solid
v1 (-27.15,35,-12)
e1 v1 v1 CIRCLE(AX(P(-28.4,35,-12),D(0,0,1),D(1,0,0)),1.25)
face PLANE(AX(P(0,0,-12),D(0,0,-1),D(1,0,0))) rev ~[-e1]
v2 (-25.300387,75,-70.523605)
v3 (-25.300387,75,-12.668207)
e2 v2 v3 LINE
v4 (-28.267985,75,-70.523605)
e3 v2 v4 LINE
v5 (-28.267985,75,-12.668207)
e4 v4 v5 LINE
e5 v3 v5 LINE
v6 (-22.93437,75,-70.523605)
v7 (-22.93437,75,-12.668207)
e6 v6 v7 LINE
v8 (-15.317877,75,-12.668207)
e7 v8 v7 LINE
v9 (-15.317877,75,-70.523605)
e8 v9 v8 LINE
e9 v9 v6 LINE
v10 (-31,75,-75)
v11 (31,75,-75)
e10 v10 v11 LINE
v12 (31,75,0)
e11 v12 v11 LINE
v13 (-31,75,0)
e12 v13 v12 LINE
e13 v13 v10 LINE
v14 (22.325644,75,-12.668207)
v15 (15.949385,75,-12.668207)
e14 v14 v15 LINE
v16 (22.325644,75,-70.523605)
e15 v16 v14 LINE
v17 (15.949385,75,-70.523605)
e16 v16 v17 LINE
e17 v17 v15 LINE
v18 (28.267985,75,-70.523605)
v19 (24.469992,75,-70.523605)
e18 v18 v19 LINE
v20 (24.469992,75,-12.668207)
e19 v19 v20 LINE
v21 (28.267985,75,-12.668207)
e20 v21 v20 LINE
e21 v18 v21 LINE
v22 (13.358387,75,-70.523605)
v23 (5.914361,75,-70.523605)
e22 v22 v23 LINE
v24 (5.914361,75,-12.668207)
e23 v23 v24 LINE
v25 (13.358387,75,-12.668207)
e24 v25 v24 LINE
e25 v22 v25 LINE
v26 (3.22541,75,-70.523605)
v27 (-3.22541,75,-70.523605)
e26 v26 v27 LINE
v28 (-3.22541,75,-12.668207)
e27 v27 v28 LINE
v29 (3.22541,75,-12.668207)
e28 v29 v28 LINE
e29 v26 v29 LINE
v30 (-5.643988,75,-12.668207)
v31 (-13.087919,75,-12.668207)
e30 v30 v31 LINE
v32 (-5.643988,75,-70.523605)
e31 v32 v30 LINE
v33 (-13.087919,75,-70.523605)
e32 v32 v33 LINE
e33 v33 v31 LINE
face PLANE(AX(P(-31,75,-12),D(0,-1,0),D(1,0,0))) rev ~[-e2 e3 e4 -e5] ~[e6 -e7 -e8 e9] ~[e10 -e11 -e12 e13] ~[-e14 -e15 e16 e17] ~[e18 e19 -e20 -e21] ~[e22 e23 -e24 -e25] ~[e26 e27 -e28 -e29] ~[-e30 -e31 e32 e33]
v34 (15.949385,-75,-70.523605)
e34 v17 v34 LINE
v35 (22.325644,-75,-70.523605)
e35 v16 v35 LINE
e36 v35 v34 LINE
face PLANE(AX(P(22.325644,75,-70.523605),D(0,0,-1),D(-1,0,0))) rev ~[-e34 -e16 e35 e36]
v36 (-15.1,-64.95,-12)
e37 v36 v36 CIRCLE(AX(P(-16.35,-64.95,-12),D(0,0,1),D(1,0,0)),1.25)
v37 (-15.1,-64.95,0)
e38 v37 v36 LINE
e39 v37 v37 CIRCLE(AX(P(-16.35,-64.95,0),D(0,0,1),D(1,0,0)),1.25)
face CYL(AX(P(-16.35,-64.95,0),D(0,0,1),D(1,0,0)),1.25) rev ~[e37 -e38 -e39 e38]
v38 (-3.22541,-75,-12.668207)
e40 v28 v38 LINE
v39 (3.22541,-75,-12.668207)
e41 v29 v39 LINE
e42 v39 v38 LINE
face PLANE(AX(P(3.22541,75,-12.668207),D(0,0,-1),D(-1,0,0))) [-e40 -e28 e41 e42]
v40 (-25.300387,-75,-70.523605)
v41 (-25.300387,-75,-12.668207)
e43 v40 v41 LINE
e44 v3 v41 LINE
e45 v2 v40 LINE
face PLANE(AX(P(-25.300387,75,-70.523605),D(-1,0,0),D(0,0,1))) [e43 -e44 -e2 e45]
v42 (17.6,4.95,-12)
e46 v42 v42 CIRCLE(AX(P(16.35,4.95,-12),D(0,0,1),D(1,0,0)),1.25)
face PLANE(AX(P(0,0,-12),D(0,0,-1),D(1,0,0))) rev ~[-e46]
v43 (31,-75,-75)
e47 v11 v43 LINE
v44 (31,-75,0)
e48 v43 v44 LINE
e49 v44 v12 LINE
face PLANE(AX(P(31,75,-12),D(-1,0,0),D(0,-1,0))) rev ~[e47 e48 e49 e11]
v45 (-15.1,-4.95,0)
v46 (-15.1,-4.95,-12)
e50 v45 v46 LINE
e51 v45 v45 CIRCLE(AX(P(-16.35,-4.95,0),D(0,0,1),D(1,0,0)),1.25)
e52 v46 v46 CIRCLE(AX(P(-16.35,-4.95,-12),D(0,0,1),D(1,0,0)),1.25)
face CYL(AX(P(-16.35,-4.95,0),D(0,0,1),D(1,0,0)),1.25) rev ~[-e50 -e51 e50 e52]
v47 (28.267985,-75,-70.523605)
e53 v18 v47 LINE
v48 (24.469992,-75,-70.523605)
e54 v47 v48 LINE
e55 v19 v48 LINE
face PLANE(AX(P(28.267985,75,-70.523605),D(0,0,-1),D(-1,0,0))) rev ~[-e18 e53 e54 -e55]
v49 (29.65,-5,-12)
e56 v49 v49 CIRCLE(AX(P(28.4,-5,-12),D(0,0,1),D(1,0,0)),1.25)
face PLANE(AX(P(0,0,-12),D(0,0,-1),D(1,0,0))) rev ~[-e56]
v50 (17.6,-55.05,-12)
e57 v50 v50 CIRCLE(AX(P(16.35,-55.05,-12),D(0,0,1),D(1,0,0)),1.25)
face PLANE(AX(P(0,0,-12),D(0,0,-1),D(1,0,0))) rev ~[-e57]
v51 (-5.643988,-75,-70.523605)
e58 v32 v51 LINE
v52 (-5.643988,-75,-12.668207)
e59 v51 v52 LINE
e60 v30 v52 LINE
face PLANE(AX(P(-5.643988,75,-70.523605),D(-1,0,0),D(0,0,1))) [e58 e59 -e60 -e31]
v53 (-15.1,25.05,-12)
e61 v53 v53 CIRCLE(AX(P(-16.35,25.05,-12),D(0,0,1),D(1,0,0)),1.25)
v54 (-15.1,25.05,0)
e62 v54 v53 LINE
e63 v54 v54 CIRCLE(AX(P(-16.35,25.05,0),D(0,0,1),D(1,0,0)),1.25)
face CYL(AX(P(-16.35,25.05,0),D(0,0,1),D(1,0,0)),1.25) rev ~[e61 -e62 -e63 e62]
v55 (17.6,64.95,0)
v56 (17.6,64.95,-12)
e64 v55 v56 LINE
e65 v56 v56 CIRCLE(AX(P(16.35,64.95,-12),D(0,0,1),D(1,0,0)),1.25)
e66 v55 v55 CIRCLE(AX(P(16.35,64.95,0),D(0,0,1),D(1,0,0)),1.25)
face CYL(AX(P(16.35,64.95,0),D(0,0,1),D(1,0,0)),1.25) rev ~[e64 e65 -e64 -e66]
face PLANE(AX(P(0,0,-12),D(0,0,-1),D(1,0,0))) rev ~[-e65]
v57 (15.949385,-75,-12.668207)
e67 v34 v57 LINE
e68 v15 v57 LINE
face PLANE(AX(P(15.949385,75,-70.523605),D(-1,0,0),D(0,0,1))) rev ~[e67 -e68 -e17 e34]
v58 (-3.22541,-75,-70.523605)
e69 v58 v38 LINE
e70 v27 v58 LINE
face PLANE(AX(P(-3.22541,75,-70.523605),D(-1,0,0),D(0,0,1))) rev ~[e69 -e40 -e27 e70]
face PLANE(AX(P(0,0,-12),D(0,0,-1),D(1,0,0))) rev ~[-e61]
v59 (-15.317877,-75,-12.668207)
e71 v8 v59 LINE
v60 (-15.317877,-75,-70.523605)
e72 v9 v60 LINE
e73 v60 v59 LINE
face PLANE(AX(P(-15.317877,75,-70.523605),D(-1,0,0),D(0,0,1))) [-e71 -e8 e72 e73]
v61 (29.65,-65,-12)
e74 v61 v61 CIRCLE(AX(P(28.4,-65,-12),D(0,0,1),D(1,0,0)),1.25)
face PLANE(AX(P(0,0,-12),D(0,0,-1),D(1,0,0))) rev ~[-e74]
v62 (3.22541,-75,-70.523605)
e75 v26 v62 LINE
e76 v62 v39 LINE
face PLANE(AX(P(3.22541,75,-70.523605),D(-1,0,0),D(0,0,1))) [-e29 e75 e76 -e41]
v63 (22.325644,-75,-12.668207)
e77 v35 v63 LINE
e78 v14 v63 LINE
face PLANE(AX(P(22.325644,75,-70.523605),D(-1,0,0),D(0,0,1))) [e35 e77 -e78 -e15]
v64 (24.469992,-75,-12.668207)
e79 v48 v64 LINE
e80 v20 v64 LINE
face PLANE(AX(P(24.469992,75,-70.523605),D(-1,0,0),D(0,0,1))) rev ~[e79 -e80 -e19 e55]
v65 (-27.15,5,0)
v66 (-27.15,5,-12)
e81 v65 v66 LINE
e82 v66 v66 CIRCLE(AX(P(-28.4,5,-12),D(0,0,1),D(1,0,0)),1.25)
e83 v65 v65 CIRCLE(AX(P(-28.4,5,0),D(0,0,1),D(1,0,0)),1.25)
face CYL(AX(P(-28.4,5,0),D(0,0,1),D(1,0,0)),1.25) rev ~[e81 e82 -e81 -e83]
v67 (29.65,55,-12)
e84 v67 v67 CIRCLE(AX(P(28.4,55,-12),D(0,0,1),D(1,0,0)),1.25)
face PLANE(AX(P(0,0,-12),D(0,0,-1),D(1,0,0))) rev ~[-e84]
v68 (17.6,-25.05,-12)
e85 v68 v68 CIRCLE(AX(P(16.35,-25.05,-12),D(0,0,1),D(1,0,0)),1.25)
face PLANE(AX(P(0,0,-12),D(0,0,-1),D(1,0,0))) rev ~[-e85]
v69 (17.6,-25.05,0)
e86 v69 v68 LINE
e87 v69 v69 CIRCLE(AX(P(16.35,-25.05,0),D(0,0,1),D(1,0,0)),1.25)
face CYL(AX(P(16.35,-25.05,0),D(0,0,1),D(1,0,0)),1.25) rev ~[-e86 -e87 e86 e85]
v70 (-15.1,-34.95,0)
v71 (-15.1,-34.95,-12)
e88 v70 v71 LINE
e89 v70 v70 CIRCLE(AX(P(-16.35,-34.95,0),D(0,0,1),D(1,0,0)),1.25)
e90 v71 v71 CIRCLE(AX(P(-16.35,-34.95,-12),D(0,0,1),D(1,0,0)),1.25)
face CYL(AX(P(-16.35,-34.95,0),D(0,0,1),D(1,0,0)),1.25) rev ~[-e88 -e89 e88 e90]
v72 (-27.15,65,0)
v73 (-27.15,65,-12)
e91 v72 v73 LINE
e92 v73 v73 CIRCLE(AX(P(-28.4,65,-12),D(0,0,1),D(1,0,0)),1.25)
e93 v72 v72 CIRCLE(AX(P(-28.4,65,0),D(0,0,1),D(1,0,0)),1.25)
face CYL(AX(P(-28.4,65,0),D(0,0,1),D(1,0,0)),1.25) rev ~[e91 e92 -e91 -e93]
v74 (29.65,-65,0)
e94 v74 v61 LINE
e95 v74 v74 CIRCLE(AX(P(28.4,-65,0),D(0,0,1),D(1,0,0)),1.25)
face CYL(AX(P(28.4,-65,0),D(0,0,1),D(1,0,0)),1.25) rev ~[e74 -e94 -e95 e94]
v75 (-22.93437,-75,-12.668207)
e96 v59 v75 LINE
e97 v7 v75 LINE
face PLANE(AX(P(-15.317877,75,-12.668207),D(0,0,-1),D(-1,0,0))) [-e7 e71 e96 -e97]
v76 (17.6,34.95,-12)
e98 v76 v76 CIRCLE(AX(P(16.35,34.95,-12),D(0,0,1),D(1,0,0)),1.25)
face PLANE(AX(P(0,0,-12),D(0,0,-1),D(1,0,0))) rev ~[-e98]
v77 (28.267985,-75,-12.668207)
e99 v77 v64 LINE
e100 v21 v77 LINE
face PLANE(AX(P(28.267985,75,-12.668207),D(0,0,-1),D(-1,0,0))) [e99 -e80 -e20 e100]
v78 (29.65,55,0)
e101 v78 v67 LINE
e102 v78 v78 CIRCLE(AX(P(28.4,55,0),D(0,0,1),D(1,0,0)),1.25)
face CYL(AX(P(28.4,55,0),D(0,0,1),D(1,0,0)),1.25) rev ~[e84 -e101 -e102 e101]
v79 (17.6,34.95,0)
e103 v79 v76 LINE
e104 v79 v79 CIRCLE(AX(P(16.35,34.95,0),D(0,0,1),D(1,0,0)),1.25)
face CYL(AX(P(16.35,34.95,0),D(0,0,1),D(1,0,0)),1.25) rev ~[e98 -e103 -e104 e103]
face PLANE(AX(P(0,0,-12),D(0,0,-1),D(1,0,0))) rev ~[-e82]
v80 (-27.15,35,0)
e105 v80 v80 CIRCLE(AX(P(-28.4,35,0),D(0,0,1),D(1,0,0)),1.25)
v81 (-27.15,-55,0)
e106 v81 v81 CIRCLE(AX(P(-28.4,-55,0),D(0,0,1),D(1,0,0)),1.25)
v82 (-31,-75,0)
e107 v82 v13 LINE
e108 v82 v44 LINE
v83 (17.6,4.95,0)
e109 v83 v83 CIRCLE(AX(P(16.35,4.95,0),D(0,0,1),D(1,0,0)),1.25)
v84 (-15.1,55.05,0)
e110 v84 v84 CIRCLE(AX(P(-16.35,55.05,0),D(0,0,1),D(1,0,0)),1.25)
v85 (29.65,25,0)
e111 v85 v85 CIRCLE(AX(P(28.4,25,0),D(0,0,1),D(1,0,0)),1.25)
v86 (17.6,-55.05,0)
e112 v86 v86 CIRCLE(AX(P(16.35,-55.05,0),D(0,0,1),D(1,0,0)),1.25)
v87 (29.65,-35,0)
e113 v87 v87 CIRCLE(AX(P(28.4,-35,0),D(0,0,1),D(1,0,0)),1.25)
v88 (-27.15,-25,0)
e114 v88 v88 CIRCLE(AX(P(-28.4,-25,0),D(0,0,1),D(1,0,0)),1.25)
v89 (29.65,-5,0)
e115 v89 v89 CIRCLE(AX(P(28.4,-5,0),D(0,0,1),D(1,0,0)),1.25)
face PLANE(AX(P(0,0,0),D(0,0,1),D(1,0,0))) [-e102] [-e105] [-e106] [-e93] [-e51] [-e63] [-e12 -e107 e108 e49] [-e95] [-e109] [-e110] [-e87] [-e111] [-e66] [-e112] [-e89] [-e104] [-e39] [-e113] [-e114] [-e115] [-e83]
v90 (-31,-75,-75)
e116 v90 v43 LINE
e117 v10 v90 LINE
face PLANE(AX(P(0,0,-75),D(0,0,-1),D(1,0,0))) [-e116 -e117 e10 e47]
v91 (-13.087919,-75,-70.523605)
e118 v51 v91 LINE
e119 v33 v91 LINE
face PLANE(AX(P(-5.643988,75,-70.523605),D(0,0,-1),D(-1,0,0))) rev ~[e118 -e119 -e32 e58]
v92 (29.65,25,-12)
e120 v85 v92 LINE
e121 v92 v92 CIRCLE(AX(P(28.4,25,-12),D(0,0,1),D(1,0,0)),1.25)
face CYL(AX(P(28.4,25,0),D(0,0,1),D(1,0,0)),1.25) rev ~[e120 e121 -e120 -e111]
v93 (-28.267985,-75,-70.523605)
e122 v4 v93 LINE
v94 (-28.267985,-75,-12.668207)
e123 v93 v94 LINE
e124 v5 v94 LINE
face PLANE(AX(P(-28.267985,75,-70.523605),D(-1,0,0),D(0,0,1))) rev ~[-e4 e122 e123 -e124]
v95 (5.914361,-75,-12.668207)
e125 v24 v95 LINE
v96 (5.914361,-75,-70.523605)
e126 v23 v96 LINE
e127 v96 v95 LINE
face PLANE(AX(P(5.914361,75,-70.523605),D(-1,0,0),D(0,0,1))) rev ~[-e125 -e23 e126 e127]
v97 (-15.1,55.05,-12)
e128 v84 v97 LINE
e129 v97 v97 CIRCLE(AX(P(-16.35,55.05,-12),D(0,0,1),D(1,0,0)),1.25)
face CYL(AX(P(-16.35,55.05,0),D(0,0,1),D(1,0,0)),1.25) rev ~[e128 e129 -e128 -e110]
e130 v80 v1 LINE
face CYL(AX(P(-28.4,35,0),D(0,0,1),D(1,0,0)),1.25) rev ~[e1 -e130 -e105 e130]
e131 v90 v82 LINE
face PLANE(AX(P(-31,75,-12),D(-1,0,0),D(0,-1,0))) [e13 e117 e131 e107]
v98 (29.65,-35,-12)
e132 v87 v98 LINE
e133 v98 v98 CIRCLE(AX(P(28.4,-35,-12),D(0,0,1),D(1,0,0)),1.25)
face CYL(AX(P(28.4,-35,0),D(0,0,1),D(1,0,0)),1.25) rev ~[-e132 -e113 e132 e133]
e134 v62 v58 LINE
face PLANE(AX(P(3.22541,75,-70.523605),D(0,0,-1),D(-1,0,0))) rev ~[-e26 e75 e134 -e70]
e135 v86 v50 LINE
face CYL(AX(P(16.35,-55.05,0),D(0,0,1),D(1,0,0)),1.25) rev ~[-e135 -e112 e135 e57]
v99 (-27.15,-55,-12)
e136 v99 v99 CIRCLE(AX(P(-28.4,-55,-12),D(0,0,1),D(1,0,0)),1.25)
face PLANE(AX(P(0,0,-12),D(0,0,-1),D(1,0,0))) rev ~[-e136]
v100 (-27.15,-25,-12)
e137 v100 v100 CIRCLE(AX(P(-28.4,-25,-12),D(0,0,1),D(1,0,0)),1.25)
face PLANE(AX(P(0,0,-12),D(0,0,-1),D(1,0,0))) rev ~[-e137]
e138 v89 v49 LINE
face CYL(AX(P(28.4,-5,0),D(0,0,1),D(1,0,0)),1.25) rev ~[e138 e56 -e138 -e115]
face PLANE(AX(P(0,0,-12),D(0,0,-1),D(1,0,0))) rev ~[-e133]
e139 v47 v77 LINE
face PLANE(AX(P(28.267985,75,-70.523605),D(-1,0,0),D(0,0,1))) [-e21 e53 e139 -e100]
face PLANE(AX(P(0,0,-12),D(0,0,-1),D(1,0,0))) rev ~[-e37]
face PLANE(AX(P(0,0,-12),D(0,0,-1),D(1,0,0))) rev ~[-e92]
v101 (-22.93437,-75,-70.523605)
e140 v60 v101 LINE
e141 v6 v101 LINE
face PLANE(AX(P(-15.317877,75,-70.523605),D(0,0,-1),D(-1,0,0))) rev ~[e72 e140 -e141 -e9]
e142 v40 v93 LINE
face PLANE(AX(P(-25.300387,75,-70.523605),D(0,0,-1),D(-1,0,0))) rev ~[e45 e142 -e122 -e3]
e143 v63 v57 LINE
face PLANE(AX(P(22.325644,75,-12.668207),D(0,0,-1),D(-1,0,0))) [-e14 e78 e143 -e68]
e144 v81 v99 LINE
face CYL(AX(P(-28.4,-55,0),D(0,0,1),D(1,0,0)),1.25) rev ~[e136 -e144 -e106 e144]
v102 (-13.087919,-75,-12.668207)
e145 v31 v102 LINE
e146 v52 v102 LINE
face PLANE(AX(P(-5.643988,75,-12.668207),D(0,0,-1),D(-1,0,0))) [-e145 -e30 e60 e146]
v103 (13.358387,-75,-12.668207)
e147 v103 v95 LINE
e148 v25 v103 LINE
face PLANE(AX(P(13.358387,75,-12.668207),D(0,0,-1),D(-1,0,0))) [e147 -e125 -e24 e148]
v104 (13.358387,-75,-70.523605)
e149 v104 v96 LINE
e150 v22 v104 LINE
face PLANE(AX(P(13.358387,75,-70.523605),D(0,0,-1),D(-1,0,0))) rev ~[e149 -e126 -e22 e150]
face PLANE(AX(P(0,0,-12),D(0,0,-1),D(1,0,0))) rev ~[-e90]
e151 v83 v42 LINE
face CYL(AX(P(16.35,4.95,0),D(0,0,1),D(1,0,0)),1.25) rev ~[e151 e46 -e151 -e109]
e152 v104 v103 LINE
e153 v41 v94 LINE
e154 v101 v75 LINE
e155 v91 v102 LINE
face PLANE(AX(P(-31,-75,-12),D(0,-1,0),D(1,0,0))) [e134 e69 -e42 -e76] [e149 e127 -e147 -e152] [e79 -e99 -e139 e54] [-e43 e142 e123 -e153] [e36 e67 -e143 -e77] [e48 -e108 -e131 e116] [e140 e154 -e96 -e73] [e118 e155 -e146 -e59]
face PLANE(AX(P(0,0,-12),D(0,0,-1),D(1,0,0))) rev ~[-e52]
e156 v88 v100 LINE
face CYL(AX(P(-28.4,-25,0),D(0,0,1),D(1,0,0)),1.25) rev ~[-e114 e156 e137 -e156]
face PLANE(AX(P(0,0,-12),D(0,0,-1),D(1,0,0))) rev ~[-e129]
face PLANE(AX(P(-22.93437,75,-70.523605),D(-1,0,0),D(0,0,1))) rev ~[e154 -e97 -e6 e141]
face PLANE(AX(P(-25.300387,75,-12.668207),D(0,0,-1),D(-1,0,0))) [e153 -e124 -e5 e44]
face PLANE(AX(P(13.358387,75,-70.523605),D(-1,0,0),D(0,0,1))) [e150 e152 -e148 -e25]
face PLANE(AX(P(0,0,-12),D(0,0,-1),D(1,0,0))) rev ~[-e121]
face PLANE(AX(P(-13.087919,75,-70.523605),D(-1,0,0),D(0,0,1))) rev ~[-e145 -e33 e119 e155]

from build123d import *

# Parameters (mm, degrees)
F0_W     = 62
F0_H     = 150
F0_R     = 1.25
F1_DEPTH = 12
F2_W     = 62
F2_H     = 150
F3_DEPTH = 63
F4_W     = 3.7979930639
F4_H     = 57.8553974628
F4_W_2   = 6.3762590289
F4_W_3   = 7.4440259486
F4_W_4   = 6.4508207142
F4_W_5   = 7.4439314194
F4_W_6   = 7.6164929196
F4_W_7   = 2.9675979167
F5_DEPTH = 150


# Not quite as in the source:
# - a feature names something its author has since deleted; it is built from what else it names


with BuildPart() as f1:
    # F0 (on Top) → F1 (new body)
    with BuildSketch(Plane.XY):
        Rectangle(F0_W, F0_H)
        with Locations((-16.35, -64.95)):
            Circle(F0_R, mode=Mode.SUBTRACT)
        with Locations((-28.4, -55)):
            Circle(F0_R, mode=Mode.SUBTRACT)
        with Locations((-28.4, -25)):
            Circle(F0_R, mode=Mode.SUBTRACT)
        with Locations((-16.35, -34.95)):
            Circle(F0_R, mode=Mode.SUBTRACT)
        with Locations((-16.35, -4.95)):
            Circle(F0_R, mode=Mode.SUBTRACT)
        with Locations((28.4, -65)):
            Circle(F0_R, mode=Mode.SUBTRACT)
        with Locations((16.35, -55.05)):
            Circle(F0_R, mode=Mode.SUBTRACT)
        with Locations((16.35, -25.05)):
            Circle(F0_R, mode=Mode.SUBTRACT)
        with Locations((28.4, -35)):
            Circle(F0_R, mode=Mode.SUBTRACT)
        with Locations((28.4, -5)):
            Circle(F0_R, mode=Mode.SUBTRACT)
        with Locations((-28.4, 5)):
            Circle(F0_R, mode=Mode.SUBTRACT)
        with Locations((-28.4, 35)):
            Circle(F0_R, mode=Mode.SUBTRACT)
        with Locations((-16.35, 25.05)):
            Circle(F0_R, mode=Mode.SUBTRACT)
        with Locations((-16.35, 55.05)):
            Circle(F0_R, mode=Mode.SUBTRACT)
        with Locations((-28.4, 65)):
            Circle(F0_R, mode=Mode.SUBTRACT)
        with Locations((16.35, 4.95)):
            Circle(F0_R, mode=Mode.SUBTRACT)
        with Locations((16.35, 34.95)):
            Circle(F0_R, mode=Mode.SUBTRACT)
        with Locations((28.4, 25)):
            Circle(F0_R, mode=Mode.SUBTRACT)
        with Locations((28.4, 55)):
            Circle(F0_R, mode=Mode.SUBTRACT)
        with Locations((16.35, 64.95)):
            Circle(F0_R, mode=Mode.SUBTRACT)
    extrude(amount=-F1_DEPTH)

    # F2 (on face) → F3 (join)
    with BuildSketch(Plane(origin=(0, 0, -12), x_dir=(1, 0, 0), z_dir=(0, 0, -1))):
        Rectangle(F2_W, F2_H)
    extrude(amount=F3_DEPTH)

    # F4 (on face) → F5 (cut)
    with BuildSketch(Plane(origin=(0, 75, 0), x_dir=(-1, 0, 0), z_dir=(0, 1, 0))):
        with Locations((-26.3689886779, -41.5959060192)):
            Rectangle(F4_W, F4_H)
        with Locations((-19.1375147551, -41.5959060192)):
            Rectangle(F4_W_2, F4_H)
        with Locations((-9.6363741904, -41.5959060192)):
            Rectangle(F4_W_3, F4_H)
        with Locations((0, -41.5959060192)):
            Rectangle(F4_W_4, F4_H)
        with Locations((9.3659532722, -41.5959060192)):
            Rectangle(F4_W_5, F4_H)
        with Locations((19.1261232831, -41.5959060192)):
            Rectangle(F4_W_6, F4_H)
        with Locations((26.7841862515, -41.5959060192)):
            Rectangle(F4_W_7, F4_H)
    extrude(amount=-F5_DEPTH, mode=Mode.SUBTRACT)


solid = f1.part
